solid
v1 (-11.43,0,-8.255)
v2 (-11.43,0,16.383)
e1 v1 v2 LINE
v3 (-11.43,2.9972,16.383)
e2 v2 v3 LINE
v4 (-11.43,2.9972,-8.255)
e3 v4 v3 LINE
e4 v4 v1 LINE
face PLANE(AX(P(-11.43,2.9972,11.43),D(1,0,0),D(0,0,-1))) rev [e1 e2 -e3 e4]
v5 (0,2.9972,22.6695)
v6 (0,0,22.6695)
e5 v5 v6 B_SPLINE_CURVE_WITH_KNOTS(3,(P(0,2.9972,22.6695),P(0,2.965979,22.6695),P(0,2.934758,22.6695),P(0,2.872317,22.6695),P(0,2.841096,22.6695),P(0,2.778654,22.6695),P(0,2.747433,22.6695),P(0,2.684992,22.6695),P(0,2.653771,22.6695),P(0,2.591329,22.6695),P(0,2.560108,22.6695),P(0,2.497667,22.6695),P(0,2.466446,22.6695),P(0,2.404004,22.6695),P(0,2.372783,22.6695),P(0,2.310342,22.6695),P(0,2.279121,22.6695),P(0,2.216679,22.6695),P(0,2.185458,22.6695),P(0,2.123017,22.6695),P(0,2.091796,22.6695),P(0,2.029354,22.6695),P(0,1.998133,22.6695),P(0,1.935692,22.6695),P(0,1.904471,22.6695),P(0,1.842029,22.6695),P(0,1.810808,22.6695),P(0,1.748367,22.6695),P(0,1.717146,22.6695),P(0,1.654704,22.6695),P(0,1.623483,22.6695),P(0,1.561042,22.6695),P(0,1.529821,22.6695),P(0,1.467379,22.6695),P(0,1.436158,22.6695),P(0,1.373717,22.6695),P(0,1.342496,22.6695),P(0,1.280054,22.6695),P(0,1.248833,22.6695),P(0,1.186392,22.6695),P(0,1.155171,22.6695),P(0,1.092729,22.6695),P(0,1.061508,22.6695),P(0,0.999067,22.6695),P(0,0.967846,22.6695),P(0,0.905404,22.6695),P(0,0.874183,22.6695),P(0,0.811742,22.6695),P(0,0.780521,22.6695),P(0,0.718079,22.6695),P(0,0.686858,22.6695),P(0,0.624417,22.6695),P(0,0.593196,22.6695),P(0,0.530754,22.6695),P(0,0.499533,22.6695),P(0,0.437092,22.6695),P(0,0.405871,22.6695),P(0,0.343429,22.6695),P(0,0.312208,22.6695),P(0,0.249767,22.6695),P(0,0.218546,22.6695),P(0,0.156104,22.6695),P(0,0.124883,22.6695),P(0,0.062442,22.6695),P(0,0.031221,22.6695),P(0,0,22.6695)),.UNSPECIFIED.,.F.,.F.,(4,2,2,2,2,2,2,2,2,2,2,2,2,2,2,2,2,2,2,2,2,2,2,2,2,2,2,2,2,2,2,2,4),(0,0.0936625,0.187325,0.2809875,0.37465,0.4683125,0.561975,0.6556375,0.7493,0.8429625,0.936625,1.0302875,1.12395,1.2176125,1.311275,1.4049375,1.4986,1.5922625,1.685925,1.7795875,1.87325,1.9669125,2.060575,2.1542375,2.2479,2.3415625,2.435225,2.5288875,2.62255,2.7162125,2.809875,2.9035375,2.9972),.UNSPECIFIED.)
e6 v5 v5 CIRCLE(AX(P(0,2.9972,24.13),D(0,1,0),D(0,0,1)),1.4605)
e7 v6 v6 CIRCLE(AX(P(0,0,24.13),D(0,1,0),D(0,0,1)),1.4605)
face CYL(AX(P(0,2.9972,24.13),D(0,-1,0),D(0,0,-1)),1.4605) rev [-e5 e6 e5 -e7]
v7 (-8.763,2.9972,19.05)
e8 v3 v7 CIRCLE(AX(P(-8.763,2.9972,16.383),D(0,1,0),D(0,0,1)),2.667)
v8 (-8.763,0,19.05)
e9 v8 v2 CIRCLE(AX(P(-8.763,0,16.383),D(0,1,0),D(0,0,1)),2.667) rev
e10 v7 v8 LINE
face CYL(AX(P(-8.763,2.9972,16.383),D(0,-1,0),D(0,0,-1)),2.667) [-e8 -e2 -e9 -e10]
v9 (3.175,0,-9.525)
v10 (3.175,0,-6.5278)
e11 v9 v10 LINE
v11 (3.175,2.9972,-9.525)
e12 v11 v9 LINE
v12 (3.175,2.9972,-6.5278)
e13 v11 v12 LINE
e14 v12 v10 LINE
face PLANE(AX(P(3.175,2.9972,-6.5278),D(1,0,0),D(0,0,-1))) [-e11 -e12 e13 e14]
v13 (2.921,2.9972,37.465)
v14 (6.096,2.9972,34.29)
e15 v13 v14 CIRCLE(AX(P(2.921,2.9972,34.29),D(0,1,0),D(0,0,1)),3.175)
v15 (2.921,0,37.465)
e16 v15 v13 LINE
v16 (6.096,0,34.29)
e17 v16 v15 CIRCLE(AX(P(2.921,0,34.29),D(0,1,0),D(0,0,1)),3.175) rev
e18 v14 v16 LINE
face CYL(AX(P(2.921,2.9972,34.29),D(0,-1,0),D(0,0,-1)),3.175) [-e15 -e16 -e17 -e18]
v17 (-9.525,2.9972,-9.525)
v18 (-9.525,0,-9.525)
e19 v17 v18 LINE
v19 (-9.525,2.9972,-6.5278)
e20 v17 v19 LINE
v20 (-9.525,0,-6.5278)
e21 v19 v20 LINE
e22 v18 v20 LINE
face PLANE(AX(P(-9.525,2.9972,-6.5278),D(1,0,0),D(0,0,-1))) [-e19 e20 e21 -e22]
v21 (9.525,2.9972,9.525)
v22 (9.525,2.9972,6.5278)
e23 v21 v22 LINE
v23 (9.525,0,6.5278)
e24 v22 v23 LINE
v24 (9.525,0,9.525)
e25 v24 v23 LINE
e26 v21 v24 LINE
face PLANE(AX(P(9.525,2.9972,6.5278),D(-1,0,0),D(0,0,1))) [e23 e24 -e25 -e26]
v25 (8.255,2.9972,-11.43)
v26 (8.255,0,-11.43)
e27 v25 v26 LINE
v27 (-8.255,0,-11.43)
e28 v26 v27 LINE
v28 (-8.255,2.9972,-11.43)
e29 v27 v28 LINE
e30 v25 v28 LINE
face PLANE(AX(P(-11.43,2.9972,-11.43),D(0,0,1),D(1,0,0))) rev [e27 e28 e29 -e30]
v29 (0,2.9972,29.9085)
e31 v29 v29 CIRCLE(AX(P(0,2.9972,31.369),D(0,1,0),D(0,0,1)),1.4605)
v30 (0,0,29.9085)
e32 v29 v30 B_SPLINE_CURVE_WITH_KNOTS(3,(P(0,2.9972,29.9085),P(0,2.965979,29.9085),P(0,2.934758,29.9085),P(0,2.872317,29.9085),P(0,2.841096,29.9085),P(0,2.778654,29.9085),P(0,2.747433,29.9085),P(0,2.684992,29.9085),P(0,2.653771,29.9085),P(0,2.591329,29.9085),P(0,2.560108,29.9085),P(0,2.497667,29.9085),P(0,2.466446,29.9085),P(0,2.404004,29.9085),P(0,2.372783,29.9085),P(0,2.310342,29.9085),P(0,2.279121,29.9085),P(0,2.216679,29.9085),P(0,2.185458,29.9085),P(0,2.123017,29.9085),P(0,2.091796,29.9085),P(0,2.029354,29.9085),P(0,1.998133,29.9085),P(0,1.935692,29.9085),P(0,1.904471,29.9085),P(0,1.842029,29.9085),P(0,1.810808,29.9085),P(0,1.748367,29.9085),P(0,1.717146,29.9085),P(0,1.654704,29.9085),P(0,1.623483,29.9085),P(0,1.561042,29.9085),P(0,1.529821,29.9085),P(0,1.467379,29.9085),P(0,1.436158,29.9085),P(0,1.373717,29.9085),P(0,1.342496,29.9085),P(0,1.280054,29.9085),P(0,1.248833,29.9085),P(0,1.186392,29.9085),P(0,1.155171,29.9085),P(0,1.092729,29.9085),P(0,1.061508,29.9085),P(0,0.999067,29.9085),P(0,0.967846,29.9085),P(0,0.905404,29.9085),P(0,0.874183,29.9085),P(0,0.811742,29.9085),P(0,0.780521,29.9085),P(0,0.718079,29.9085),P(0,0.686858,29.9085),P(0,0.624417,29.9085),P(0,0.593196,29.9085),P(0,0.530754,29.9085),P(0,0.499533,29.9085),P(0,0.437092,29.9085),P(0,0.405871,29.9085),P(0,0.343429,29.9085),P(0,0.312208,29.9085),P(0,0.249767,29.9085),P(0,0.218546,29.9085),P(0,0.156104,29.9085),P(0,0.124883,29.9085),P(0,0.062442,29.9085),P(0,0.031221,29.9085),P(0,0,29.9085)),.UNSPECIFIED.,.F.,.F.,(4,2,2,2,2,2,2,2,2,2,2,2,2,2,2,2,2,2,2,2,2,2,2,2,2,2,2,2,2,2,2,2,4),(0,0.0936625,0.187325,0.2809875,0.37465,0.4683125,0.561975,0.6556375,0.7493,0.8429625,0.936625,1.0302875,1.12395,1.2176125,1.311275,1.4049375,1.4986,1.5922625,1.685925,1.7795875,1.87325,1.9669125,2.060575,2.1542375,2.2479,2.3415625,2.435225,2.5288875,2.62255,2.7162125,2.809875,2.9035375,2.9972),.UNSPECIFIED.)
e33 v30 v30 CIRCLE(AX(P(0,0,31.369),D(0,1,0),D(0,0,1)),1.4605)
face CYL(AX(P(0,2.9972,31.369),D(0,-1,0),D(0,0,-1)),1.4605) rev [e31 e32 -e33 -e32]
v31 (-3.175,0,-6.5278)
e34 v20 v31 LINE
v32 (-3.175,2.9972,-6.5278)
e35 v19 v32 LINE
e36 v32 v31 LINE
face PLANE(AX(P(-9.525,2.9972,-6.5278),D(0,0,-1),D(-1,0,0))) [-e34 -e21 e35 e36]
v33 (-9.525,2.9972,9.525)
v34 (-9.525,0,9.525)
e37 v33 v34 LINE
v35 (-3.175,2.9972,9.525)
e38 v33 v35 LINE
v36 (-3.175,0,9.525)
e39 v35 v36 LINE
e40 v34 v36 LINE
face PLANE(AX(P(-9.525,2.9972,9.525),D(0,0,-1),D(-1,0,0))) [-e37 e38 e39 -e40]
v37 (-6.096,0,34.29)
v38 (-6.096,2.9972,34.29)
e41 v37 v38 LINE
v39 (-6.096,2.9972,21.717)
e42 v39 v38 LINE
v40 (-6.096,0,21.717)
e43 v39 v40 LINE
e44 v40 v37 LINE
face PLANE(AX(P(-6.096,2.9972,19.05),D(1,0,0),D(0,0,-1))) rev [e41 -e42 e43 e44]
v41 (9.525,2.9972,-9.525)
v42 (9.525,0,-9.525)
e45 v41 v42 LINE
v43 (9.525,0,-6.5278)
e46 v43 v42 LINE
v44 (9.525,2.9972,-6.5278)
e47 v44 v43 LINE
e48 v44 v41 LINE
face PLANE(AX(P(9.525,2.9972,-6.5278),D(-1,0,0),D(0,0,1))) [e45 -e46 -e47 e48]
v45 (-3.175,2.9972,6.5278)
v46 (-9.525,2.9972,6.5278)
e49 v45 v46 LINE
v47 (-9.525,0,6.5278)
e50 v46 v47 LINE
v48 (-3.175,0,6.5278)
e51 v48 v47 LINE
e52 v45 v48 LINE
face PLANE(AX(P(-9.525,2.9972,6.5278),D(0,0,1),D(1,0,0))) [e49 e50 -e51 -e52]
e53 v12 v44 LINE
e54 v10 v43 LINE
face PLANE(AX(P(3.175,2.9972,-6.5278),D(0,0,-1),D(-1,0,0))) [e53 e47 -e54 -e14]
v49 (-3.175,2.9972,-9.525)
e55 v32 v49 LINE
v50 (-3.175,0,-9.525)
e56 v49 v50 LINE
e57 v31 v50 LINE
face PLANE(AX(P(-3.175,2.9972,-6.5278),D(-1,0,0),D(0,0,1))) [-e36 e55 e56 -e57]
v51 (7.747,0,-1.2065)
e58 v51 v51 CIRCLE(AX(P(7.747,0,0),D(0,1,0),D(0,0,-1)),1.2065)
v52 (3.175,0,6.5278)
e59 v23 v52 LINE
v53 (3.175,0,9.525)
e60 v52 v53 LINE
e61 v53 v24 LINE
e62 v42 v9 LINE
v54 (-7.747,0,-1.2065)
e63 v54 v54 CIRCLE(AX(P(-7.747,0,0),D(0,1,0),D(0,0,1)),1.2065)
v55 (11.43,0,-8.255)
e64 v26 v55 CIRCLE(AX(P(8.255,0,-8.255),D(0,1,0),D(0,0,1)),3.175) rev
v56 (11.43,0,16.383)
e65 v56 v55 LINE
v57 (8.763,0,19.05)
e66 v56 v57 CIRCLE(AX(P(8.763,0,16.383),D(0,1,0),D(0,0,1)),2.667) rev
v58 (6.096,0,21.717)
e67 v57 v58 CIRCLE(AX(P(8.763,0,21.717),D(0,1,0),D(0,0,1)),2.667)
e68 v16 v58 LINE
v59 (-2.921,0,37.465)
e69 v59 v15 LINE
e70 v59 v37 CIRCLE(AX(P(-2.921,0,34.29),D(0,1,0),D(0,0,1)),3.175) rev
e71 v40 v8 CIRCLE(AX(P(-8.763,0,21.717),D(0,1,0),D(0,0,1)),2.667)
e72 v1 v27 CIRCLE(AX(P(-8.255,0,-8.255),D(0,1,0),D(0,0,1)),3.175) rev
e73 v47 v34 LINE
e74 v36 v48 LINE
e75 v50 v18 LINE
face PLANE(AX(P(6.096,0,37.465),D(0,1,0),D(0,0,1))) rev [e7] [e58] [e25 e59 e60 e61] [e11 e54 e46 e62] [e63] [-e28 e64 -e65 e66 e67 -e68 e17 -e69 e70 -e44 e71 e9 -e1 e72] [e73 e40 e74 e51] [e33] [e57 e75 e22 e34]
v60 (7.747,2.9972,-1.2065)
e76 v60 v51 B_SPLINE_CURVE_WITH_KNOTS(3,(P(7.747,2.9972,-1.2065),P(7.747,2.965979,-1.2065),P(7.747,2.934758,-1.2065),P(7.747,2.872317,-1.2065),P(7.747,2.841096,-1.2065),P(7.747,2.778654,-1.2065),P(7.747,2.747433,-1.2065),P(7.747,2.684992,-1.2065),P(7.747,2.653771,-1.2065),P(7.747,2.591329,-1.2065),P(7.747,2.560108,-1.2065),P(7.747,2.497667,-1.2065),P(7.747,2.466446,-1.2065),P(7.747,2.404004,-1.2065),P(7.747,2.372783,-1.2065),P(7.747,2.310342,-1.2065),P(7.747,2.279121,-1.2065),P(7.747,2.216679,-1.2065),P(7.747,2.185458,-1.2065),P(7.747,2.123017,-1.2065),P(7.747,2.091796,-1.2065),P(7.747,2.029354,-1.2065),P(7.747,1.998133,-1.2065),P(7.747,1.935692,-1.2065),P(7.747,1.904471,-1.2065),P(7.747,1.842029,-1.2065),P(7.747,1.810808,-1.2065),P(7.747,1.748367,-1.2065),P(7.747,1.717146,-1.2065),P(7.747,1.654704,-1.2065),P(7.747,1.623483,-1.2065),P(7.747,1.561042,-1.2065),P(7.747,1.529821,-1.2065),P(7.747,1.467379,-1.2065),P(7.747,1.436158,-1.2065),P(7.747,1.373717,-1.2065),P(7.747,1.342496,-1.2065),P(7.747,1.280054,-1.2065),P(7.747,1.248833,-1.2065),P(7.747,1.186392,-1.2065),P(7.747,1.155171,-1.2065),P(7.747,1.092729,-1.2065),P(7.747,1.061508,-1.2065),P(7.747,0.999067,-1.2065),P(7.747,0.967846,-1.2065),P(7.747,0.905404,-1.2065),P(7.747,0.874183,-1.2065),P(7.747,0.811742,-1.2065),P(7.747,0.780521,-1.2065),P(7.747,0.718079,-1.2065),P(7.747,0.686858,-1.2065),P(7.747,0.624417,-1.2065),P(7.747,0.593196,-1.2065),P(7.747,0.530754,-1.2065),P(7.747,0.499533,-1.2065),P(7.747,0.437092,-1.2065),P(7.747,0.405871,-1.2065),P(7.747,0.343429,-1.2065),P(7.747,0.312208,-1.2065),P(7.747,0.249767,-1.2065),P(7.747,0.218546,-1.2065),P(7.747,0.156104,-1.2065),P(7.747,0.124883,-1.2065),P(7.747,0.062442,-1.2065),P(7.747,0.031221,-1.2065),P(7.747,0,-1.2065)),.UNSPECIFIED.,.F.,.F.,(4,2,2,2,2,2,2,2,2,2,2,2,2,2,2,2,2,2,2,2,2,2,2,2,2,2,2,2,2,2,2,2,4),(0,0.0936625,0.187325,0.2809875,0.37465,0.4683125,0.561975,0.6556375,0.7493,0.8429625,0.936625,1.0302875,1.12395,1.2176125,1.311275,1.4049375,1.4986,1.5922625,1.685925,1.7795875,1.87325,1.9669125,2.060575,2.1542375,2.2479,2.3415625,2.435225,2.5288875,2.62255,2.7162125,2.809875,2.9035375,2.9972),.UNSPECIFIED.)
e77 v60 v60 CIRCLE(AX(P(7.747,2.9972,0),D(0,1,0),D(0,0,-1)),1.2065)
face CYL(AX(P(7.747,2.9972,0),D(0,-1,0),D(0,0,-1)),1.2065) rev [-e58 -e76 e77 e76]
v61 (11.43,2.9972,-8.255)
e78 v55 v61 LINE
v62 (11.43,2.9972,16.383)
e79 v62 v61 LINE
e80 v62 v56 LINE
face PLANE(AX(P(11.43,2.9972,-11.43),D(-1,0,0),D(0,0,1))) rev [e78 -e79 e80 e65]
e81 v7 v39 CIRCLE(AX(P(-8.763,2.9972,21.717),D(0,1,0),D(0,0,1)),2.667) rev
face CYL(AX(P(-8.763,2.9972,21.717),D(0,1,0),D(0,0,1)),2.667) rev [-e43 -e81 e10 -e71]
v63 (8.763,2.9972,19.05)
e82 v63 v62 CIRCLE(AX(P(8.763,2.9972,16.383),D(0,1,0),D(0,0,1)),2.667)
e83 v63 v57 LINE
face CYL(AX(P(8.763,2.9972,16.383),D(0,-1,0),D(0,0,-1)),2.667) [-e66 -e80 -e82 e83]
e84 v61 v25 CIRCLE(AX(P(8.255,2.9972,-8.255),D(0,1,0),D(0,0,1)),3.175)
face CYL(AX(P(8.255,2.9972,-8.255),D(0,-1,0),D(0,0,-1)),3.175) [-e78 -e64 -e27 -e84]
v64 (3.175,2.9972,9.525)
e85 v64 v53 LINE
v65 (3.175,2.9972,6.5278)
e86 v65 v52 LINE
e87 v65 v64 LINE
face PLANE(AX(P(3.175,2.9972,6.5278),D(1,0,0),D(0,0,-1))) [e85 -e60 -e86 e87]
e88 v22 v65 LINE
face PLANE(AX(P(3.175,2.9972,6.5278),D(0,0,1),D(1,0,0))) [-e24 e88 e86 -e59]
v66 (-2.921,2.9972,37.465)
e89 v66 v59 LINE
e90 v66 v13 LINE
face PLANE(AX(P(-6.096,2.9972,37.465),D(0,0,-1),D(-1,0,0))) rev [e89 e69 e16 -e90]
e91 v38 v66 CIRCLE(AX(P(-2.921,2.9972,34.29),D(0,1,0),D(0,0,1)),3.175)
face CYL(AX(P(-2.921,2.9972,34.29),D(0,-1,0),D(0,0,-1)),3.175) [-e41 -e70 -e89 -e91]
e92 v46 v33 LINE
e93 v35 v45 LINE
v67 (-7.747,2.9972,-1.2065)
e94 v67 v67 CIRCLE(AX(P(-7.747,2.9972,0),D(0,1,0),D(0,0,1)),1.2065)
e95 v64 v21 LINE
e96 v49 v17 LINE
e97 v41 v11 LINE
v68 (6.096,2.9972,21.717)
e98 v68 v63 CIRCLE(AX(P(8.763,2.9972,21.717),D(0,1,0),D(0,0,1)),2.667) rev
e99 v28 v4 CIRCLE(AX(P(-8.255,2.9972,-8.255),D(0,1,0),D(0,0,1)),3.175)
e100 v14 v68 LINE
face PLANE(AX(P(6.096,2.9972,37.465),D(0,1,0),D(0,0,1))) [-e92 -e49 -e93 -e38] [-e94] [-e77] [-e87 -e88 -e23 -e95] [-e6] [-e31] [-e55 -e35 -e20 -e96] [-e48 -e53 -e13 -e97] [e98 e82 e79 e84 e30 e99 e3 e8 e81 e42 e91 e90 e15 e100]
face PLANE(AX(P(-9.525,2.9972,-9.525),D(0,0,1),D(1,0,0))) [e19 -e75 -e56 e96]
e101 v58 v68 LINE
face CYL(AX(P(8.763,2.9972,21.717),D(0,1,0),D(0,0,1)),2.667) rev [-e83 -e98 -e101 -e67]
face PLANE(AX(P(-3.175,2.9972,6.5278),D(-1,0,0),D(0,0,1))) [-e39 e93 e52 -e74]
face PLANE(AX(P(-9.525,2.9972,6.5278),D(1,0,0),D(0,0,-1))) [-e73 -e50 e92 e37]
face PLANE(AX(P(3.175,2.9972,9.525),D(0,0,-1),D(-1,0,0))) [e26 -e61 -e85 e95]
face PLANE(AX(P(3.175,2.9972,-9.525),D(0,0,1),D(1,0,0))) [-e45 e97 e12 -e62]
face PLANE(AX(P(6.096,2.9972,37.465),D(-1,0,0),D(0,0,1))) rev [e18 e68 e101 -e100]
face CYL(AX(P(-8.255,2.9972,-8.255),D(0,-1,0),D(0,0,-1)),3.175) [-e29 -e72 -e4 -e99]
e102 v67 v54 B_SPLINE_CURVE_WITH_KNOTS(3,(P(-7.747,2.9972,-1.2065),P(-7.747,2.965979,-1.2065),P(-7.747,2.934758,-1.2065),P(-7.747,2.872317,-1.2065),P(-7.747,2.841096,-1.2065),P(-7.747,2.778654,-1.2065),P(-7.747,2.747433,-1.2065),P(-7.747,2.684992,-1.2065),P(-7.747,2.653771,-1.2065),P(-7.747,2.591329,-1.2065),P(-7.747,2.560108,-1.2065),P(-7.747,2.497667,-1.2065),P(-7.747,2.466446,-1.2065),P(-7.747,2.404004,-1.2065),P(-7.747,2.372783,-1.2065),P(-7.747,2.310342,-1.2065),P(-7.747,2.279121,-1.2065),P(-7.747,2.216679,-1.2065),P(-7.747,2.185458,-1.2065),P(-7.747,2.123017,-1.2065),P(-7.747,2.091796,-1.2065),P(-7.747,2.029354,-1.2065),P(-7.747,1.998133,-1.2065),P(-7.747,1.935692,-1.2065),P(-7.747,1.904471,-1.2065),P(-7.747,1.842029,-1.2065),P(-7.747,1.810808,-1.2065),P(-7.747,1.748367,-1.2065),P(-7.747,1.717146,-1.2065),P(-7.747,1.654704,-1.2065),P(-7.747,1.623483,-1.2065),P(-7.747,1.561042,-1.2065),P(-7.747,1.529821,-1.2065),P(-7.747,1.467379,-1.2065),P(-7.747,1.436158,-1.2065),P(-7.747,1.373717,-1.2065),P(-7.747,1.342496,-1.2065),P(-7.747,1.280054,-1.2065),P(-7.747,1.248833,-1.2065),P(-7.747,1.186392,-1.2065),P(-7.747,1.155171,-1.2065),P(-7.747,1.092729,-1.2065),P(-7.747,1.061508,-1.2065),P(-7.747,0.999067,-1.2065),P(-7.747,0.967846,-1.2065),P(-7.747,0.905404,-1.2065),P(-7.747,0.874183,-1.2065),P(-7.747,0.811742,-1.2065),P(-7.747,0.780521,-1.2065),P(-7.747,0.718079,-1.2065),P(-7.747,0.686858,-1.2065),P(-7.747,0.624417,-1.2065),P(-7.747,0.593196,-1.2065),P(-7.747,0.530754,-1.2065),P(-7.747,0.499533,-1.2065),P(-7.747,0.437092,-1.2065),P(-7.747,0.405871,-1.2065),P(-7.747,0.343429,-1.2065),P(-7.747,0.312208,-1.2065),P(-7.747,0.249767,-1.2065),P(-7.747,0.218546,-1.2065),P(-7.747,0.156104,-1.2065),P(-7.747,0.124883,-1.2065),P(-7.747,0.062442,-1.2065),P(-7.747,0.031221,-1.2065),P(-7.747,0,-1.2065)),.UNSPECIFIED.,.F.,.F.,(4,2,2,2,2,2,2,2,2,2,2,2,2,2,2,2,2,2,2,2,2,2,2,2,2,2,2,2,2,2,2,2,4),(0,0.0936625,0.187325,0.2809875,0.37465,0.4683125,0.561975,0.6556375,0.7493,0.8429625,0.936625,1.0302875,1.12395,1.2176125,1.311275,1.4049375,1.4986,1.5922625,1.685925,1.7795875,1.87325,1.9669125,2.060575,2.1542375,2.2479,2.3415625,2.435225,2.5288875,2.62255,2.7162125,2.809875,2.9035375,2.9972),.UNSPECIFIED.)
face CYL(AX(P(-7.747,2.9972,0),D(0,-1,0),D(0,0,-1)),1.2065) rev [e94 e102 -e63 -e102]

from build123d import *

# Parameters (mm, degrees)
SKETCH1_R           = 1.2065
SKETCH1_R_2         = 1.4605
SKETCH1_W           = 6.35
SKETCH1_H           = 2.9972
BOSS_EXTRUDE1_DEPTH = 2.9972
FILLET1_R           = 3.175
FILLET2_START       = -1
FILLET2_DEPTH       = 5
FILLET2_2_DEPTH     = 2.9972


with BuildPart() as part:
    # Sketch1 → Boss-Extrude1 (new body)
    with BuildSketch(Plane(origin=(0, 0, 0), x_dir=(1, 0, 0), z_dir=(0, 1, 0))):
        Polygon((-11.43, -11.43), (-11.43, -19.05), (-6.096, -19.05), (-6.096, -37.465), (0, -37.465), (6.096, -37.465), (6.096, -19.05), (11.43, -19.05), (11.43, -11.43), (11.43, 11.43), (-11.43, 11.43), align=None)
        with Locations(Location((-7.747, 0, 0), (0, 0, 90))):
            Circle(SKETCH1_R, mode=Mode.SUBTRACT)
        with Locations(Location((7.747, 0, 0), (0, 0, 90))):
            Circle(SKETCH1_R, mode=Mode.SUBTRACT)
        with Locations(Location((0, -24.13, 0), (0, 0, 90))):
            Circle(SKETCH1_R_2, mode=Mode.SUBTRACT)
        with Locations(Location((0, -31.369, 0), (0, 0, 90))):
            Circle(SKETCH1_R_2, mode=Mode.SUBTRACT)
        with Locations((6.35, 8.0264)):
            Rectangle(SKETCH1_W, SKETCH1_H, mode=Mode.SUBTRACT)
        with Locations((-6.35, -8.0264)):
            Rectangle(SKETCH1_W, SKETCH1_H, mode=Mode.SUBTRACT)
        with Locations((6.35, -8.0264)):
            Rectangle(SKETCH1_W, SKETCH1_H, mode=Mode.SUBTRACT)
        with Locations((-6.35, 8.0264)):
            Rectangle(SKETCH1_W, SKETCH1_H, mode=Mode.SUBTRACT)
    extrude(amount=BOSS_EXTRUDE1_DEPTH)

    # Fillet1
    fillet1_edges = [part.edges().sort_by_distance(p)[0] for p in [
        (-6.096, 1.4986, 37.465),
        (-11.43, 1.4986, -11.43),
        (11.43, 1.4986, -11.43),
        (6.096, 1.4986, 37.465),
    ]]
    fillet(fillet1_edges, radius=FILLET1_R)

    # Fillet2: read off the stored shape, not the designer's step
    # Fillet2 outline → Fillet2 (cut)
    with BuildSketch(Plane(origin=(0, 0, 0), x_dir=(1, 0, 0), z_dir=(0, 1, 0)).offset(FILLET2_START)):
        with BuildLine():
            ThreePointArc((11.43, -16.383), (10.648853785, -18.268853785), (8.763, -19.05))
            Line((8.763, -19.05), (11.43, -19.05))
            Line((11.43, -19.05), (11.43, -16.383))
        make_face()
        with BuildLine():
            Line((-11.43, -19.05), (-8.763, -19.05))
            ThreePointArc((-8.763, -19.05), (-10.648853785, -18.268853785), (-11.43, -16.383))
            Line((-11.43, -16.383), (-11.43, -19.05))
        make_face()
    extrude(amount=FILLET2_DEPTH, mode=Mode.SUBTRACT)

    # Fillet2 2 outline → Fillet2 2 (add)
    with BuildSketch(Plane(origin=(0, 0, 0), x_dir=(1, 0, 0), z_dir=(0, 1, 0))):
        with BuildLine():
            ThreePointArc((6.096, -21.717), (6.877146215, -19.831146215), (8.763, -19.05))
            Line((8.763, -19.05), (6.096, -19.05))
            Line((6.096, -19.05), (6.096, -21.717))
        make_face()
        with BuildLine():
            Line((-6.096, -19.05), (-8.763, -19.05))
            ThreePointArc((-8.763, -19.05), (-6.877146215, -19.831146215), (-6.096, -21.717))
            Line((-6.096, -21.717), (-6.096, -19.05))
        make_face()
    extrude(amount=FILLET2_2_DEPTH)


solid = part.part
